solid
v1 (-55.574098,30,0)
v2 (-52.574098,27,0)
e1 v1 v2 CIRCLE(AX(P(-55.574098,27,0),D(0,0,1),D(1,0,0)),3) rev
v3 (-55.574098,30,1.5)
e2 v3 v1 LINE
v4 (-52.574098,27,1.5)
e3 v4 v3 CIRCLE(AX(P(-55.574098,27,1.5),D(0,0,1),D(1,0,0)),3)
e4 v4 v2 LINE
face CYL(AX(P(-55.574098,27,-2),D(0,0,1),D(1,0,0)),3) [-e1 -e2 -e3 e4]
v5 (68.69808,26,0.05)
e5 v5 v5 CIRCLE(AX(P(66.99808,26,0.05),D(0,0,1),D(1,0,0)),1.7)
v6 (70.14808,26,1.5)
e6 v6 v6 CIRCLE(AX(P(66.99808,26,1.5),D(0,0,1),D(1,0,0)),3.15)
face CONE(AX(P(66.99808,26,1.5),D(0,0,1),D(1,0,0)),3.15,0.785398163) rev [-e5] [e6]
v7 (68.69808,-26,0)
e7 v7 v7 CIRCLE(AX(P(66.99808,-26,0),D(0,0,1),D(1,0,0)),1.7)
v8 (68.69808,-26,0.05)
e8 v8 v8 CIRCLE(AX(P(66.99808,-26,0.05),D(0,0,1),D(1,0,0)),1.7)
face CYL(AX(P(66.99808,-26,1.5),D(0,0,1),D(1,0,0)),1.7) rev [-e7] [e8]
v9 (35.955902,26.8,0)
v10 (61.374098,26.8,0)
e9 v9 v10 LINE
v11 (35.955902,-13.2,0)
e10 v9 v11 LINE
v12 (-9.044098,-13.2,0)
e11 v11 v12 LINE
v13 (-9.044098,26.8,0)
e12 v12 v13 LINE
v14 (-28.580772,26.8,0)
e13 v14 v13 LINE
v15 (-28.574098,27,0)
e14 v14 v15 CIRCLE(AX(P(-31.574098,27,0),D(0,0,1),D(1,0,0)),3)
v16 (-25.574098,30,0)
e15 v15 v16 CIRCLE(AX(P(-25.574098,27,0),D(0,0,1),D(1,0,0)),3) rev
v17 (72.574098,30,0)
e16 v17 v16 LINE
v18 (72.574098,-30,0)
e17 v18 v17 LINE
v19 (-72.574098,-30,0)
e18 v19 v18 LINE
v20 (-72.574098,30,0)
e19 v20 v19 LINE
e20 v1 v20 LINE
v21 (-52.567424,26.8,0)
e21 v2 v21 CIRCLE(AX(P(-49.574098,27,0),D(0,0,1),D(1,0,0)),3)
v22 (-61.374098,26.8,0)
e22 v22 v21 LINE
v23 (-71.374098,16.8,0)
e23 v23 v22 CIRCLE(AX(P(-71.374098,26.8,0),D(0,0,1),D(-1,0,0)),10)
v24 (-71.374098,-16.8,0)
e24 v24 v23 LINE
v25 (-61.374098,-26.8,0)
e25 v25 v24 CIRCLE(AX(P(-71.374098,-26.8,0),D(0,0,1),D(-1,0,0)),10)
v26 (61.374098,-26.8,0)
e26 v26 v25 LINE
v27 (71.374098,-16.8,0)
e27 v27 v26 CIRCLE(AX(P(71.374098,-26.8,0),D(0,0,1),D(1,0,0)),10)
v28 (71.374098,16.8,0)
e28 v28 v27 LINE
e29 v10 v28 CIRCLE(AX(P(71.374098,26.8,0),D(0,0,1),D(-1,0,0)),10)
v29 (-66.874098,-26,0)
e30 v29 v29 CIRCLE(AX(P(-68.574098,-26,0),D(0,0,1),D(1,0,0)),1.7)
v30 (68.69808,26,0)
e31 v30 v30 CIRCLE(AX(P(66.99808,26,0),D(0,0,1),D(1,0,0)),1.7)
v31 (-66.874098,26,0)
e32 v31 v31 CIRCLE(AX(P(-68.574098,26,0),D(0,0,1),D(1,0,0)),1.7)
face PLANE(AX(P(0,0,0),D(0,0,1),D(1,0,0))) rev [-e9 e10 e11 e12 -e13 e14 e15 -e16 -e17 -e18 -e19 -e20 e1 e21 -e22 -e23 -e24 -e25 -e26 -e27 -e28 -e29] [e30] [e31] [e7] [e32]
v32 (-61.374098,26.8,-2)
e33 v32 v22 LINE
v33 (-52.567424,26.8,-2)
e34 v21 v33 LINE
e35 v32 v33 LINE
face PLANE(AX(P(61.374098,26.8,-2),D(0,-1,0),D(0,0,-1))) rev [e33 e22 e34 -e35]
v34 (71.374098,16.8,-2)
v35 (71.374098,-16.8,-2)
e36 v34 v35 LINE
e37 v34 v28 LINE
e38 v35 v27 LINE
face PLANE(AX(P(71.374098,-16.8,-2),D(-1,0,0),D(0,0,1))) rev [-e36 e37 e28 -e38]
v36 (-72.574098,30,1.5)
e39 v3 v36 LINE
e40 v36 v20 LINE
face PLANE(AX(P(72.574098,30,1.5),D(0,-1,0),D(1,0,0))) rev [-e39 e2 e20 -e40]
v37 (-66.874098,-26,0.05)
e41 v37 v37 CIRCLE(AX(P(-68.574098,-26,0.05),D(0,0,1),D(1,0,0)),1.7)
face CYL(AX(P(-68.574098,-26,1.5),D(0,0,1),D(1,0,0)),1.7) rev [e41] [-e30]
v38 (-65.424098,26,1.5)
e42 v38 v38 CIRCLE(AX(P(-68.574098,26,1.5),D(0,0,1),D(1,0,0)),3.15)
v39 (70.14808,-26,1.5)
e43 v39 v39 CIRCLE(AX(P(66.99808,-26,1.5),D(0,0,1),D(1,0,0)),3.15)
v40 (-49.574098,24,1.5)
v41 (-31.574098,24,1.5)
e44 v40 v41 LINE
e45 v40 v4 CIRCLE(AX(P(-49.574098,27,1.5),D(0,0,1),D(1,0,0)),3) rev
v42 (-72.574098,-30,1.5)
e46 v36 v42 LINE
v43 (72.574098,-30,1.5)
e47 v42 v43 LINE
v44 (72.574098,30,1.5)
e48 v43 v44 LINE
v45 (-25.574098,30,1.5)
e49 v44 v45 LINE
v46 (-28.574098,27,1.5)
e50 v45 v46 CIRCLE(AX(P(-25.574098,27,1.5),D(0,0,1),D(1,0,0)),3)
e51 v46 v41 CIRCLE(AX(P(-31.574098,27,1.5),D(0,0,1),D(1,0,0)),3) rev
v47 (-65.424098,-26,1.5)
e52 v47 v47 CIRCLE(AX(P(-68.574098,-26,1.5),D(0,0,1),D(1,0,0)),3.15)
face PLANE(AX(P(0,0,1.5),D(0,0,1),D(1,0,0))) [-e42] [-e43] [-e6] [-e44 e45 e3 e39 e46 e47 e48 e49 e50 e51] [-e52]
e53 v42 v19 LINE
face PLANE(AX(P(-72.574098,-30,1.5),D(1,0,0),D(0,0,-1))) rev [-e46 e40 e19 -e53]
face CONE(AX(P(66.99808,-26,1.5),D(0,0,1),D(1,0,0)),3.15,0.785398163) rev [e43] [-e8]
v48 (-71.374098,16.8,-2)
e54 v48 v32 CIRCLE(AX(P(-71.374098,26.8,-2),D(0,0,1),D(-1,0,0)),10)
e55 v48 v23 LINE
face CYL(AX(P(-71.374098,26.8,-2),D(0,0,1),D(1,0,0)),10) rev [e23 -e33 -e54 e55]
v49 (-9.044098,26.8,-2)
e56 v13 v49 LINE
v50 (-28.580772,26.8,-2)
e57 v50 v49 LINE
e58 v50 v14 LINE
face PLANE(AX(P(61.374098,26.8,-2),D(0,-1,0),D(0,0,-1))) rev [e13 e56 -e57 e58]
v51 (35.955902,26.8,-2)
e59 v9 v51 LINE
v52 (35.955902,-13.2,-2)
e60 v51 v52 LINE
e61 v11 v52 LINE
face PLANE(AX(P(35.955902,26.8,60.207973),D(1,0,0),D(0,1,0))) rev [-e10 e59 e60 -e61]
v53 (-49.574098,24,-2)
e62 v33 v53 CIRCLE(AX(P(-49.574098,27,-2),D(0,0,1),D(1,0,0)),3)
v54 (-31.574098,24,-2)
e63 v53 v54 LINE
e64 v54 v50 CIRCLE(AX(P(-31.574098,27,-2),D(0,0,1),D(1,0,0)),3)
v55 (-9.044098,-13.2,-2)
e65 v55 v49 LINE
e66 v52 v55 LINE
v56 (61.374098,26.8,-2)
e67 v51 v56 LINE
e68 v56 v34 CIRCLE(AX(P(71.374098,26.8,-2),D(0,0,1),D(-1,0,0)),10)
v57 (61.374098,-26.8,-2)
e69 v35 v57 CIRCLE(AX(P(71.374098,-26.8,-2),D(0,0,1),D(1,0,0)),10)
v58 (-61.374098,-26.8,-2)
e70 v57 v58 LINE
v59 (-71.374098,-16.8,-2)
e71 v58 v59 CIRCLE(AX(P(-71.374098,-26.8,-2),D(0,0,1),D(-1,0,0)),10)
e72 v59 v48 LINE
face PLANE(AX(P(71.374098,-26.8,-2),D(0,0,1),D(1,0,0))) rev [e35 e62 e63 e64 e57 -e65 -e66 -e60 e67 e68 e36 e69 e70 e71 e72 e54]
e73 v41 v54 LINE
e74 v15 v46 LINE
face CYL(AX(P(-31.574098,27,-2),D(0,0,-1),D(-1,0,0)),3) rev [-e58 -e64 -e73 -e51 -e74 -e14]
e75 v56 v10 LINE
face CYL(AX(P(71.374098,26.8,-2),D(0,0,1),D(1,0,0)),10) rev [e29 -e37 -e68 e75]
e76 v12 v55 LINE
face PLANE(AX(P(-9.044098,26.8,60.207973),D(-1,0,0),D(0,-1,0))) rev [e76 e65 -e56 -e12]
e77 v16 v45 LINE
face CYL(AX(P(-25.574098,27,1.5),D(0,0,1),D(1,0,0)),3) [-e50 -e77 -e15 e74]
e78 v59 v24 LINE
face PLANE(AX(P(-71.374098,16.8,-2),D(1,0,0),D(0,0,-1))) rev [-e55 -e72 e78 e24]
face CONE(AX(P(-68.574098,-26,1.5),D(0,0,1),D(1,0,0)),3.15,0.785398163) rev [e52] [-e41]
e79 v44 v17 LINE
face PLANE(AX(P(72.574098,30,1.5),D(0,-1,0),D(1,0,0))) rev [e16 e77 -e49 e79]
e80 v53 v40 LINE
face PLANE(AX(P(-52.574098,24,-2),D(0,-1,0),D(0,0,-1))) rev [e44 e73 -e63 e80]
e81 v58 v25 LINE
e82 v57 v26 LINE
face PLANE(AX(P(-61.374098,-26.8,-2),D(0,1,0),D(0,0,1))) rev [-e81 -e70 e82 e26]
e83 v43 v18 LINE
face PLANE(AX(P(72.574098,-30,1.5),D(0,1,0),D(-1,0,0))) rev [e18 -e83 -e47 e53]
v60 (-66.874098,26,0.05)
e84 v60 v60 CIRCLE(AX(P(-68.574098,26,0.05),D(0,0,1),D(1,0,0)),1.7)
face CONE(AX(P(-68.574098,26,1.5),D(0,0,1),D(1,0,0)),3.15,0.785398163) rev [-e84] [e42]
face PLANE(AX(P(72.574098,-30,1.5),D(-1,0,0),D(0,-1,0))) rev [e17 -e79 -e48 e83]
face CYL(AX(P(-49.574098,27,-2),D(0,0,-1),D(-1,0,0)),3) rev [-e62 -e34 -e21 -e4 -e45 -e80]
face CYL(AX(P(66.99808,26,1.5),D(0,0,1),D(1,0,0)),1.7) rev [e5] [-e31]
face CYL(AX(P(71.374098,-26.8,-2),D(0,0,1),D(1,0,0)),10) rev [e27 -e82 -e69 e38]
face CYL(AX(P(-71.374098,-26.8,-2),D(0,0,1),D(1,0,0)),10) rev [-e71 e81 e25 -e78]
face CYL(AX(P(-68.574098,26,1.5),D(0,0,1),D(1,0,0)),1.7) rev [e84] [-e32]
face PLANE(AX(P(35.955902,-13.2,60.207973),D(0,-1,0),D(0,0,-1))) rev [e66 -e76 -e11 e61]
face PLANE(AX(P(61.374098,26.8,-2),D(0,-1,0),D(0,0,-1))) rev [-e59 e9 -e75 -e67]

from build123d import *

# Parameters (mm, degrees)
ESQUISSE1_W                                 = 145.148196
ESQUISSE1_H                                 = 60
BOSS_EXTRU_1_DEPTH                          = 1.5
BOSS_EXTRU_2_DEPTH                          = 2
FRAISAGE_POUR_VIS_T_TE_FRAIS_E_M31_AT_COUNT = 2
FRAISAGE_POUR_VIS_T_TE_FRAIS_E_M31_AT_PITCH = 52
FRAISAGE_POUR_VIS_T_TE_FRAIS_E_M31_2_COUNT  = 2
FRAISAGE_POUR_VIS_T_TE_FRAIS_E_M31_2_PITCH  = 135.572178
FRAISAGE_POUR_VIS_T_TE_FRAIS_E_M31_3_COUNT  = 2
FRAISAGE_POUR_VIS_T_TE_FRAIS_E_M31_3_PITCH  = 145.20267025
ENL_V_MAT_EXTRU_1_DEPTH                     = 79.608203774
ENL_V_MAT_EXTRU_1_DEPTH_BACK                = 79.608203774
ESQUISSE6_W                                 = 24
ESQUISSE6_H                                 = 6
CONG_1_R                                    = 3
ESQUISSE7_W                                 = 45
ESQUISSE7_H                                 = 40
ENL_V_MAT_EXTRU_2_DEPTH                     = 2


with BuildPart() as part:
    # Esquisse1 → Boss.-Extru.1 (new body)
    with BuildSketch(Plane.XY):
        Rectangle(ESQUISSE1_W, ESQUISSE1_H)
    extrude(amount=BOSS_EXTRU_1_DEPTH)

    # Esquisse2 → Boss.-Extru.2 (add)
    with BuildSketch(Plane(origin=(0, 0, 0), x_dir=(-1, 0, 0), z_dir=(0, 0, -1))):
        with BuildLine():
            Line((-71.374098, -16.8), (-71.374098, 16.8))
            ThreePointArc((-71.374098, 16.8), (-64.303030188, 19.728932188), (-61.374098, 26.8))
            Line((-61.374098, 26.8), (61.374098, 26.8))
            ThreePointArc((61.374098, 26.8), (64.303030188, 19.728932188), (71.374098, 16.8))
            Line((71.374098, 16.8), (71.374098, -16.8))
            ThreePointArc((71.374098, -16.8), (64.303030188, -19.728932188), (61.374098, -26.8))
            Line((61.374098, -26.8), (-61.374098, -26.8))
            ThreePointArc((-61.374098, -26.8), (-64.303030188, -19.728932188), (-71.374098, -16.8))
        make_face()
    extrude(amount=BOSS_EXTRU_2_DEPTH)

    # Esquisse5 → Fraisage pour vis à tête fraisée M31 (revolve, cut)
    with BuildSketch(Plane(origin=(-68.574098, 26, 1.5), x_dir=(0, -1, 0), z_dir=(1, 0, 0))):
        Polygon((0, 0), (0, 1.5), (1.7, 1.5), (1.7, 1.45), (3.15, 0), align=None)
    fraisage_pour_vis_t_te_frais_e_m31 = revolve(axis=Axis((-68.574098, 26, 7.85), (0, 0, -1)), mode=Mode.SUBTRACT)

    # Fraisage pour vis à tête fraisée M31 at: Fraisage pour vis à tête fraisée M31 ×2
    with Locations(*[(0, -i * FRAISAGE_POUR_VIS_T_TE_FRAIS_E_M31_AT_PITCH, 0) for i in range(1, FRAISAGE_POUR_VIS_T_TE_FRAIS_E_M31_AT_COUNT)]):
        add(fraisage_pour_vis_t_te_frais_e_m31, mode=Mode.SUBTRACT)

    # Fraisage pour vis _ t_te frais_e M31 2: Fraisage pour vis à tête fraisée M31 ×2
    with Locations(*[(i * FRAISAGE_POUR_VIS_T_TE_FRAIS_E_M31_2_PITCH, 0, 0) for i in range(1, FRAISAGE_POUR_VIS_T_TE_FRAIS_E_M31_2_COUNT)]):
        add(fraisage_pour_vis_t_te_frais_e_m31, mode=Mode.SUBTRACT)

    # Fraisage pour vis _ t_te frais_e M31 3: Fraisage pour vis à tête fraisée M31 ×2
    with Locations(*[Vector(0.9336755155176905, -0.35812013588009123, 0) * (i * FRAISAGE_POUR_VIS_T_TE_FRAIS_E_M31_3_PITCH) for i in range(1, FRAISAGE_POUR_VIS_T_TE_FRAIS_E_M31_3_COUNT)]):
        add(fraisage_pour_vis_t_te_frais_e_m31, mode=Mode.SUBTRACT)

    # Esquisse6 → Enlèv. mat.-Extru.1 (cut, two sides: drawn at the far end of the back side and taken through both)
    with BuildSketch(Plane.XY.offset(1.5).offset(-ENL_V_MAT_EXTRU_1_DEPTH_BACK)):
        with Locations((-40.574098, 27)):
            Rectangle(ESQUISSE6_W, ESQUISSE6_H)
    extrude(amount=ENL_V_MAT_EXTRU_1_DEPTH + ENL_V_MAT_EXTRU_1_DEPTH_BACK, mode=Mode.SUBTRACT)

    # Congé1
    cong_1_edges = [part.edges().sort_by_distance(p)[0] for p in [
        (-28.574098, 30, 0.75),
        (-28.574098, 24, -0.25),
        (-52.574098, 30, 0.75),
        (-52.574098, 24, -0.25),
    ]]
    fillet(cong_1_edges, radius=CONG_1_R - 0.0001)  # a hair under: the kernel refuses the full size

    # Esquisse7 → Enlèv. mat.-Extru.2 (cut)
    with BuildSketch(Plane(origin=(0, 0, -2), x_dir=(-1, 0, 0), z_dir=(0, 0, -1))):
        with Locations((-13.455902, 6.8)):
            Rectangle(ESQUISSE7_W, ESQUISSE7_H)
    extrude(amount=-ENL_V_MAT_EXTRU_2_DEPTH, mode=Mode.SUBTRACT)


solid = part.part
